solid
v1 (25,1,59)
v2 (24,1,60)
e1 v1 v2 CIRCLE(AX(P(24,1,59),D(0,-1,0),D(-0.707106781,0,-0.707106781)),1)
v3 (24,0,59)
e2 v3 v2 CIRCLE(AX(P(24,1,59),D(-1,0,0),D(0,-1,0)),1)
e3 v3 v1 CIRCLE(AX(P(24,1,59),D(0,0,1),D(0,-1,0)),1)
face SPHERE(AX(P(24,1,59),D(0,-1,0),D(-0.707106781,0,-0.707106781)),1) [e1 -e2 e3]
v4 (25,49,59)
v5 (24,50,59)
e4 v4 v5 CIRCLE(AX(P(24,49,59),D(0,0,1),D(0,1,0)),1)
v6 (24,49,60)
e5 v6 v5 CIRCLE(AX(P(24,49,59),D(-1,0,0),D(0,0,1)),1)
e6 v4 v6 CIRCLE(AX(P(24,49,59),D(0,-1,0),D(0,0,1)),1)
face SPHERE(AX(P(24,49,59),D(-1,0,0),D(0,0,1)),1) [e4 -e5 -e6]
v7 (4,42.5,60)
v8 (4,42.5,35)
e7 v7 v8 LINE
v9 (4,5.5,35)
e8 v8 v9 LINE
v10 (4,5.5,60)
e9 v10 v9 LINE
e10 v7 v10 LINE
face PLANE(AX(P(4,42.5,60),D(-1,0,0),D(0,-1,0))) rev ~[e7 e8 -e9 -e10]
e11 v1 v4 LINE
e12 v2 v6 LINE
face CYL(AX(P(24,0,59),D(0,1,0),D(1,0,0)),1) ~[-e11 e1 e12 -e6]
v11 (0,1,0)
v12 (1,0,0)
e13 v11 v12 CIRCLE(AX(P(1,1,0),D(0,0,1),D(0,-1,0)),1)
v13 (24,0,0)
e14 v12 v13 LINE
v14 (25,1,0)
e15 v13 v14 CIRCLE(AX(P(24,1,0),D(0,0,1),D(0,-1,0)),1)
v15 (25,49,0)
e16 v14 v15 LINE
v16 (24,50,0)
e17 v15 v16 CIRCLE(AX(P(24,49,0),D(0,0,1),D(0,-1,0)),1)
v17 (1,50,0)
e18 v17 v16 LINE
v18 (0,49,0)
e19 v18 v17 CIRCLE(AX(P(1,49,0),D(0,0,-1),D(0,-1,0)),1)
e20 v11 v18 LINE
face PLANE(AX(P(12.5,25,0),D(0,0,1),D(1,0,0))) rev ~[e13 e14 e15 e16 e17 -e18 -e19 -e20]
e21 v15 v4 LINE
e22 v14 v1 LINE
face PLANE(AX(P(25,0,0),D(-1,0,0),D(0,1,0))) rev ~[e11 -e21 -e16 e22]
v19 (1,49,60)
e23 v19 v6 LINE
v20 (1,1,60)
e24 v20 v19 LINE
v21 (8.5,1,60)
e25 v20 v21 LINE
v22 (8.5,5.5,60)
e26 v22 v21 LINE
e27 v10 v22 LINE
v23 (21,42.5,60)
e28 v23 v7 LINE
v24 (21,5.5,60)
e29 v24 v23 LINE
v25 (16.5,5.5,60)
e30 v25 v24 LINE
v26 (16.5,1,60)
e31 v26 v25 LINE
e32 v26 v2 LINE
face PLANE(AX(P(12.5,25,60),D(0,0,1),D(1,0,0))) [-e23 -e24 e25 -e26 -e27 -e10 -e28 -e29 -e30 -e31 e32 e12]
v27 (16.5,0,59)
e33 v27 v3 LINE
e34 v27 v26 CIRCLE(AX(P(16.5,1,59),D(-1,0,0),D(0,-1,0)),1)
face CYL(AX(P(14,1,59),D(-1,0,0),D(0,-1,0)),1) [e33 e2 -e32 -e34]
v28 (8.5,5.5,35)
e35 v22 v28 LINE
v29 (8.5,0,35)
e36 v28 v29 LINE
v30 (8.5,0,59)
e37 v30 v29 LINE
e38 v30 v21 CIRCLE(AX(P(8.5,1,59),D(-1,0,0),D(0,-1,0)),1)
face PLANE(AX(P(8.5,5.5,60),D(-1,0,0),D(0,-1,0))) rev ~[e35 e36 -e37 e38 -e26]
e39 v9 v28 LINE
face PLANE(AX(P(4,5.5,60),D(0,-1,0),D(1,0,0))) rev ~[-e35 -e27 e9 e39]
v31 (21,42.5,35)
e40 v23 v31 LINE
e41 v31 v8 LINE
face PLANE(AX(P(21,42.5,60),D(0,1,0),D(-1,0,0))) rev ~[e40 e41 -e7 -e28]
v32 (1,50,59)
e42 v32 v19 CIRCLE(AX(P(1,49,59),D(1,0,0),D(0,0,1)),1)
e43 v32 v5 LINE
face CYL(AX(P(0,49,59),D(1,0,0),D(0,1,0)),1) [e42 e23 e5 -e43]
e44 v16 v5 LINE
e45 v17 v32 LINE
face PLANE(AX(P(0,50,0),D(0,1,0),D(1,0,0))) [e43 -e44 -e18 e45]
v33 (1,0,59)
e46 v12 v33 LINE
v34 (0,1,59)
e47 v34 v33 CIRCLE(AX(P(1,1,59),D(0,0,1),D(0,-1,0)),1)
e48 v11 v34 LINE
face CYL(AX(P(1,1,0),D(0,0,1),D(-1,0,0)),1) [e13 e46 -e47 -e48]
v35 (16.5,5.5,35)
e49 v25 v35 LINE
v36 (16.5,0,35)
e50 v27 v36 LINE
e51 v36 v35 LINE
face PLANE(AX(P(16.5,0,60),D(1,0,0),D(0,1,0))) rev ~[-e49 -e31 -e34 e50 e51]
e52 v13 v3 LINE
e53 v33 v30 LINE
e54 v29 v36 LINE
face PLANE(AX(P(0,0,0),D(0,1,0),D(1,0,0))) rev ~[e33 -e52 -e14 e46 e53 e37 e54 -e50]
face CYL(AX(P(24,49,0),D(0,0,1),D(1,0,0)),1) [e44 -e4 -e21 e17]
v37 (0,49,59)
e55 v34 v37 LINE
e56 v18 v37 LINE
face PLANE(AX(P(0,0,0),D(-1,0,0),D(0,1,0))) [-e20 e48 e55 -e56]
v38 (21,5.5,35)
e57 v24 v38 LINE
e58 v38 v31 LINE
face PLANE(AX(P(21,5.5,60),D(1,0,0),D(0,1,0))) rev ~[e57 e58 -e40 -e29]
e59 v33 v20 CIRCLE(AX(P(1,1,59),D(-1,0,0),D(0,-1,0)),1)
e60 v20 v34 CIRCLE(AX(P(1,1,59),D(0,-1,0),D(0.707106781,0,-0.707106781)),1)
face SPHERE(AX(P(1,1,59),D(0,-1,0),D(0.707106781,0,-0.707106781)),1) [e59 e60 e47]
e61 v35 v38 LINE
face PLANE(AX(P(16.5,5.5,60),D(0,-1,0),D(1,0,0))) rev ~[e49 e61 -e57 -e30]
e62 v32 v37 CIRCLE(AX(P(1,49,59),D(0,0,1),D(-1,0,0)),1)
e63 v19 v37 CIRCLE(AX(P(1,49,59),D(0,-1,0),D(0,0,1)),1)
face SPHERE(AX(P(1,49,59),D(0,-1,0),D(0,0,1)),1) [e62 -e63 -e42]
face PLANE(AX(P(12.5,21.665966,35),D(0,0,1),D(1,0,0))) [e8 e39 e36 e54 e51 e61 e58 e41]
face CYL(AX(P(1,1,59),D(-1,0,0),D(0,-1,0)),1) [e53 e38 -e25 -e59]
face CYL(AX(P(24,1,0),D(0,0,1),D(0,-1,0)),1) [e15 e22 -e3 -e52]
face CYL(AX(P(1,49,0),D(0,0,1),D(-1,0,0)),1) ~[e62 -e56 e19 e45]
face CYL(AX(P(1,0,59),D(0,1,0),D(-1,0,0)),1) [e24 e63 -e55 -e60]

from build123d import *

# Parameters (mm, degrees)
F0_W         = 25
F0_H         = 50
F1_DEPTH     = 60
F2_R         = 1
F4_DEPTH     = 25
F5_T1_DEPTH  = 10
F5_T3_DEPTH  = 10
F5_S7_W      = 1
F5_S7_H      = 1
F5_T8_DEPTH  = 1
F5_S13_W     = 1
F5_S13_H     = 1
F5_T14_DEPTH = 1


# Not quite as in the source:
# - a fillet or chamfer that OpenCascade refuses, or shapes differently, is made with other operations: its cross-section is extruded or revolved along the edge and cut away or added


with BuildPart() as f1:
    # F0 (on Top) → F1 (new body)
    with BuildSketch(Plane.XY):
        with Locations((12.5, 25)):
            Rectangle(F0_W, F0_H)
    extrude(amount=F1_DEPTH)

    # F2
    f2_edges = [f1.edges().sort_by_distance(p)[0] for p in [
        (0, 25, 60),
        (12.5, 50, 60),
        (25, 25, 60),
        (25, 0, 30),
        (0, 0, 30),
        (0, 50, 30),
        (25, 50, 30),
    ]]
    fillet(f2_edges, radius=F2_R)

    # F3 (on face) → F4 (cut)
    with BuildSketch(Plane.XY.offset(60)):
        Polygon((21, 42.5), (4, 42.5), (4, 5.5), (8.5, 5.5), (8.5, 0), (16.5, 0), (16.5, 5.5), (21, 5.5), align=None)
    extrude(amount=-F4_DEPTH, mode=Mode.SUBTRACT)

    # F5: fillet of radius 1 on 2 edges, made by hand

    # F5_s2 → F5_t1 (cut)
    with BuildSketch(Plane.YZ.offset(1)):
        with BuildLine():
            ThreePointArc((0, 59), (0.2928932188, 59.7071067812), (1, 60))
            Line((1, 60), (0, 60))
            Line((0, 60), (0, 59))
        make_face()
    extrude(amount=F5_T1_DEPTH, mode=Mode.SUBTRACT)

    # F5_s4 → F5_t3 (cut)
    with BuildSketch(Plane.YZ.offset(14)):
        with BuildLine():
            ThreePointArc((0, 59), (0.2928932188, 59.7071067812), (1, 60))
            Line((1, 60), (0, 60))
            Line((0, 60), (0, 59))
        make_face()
    extrude(amount=F5_T3_DEPTH, mode=Mode.SUBTRACT)


with BuildPart() as f5_tool6:
    # F5_s7 → F5_t8 (new body)
    with BuildSketch(Plane.XZ.offset(-1)):
        with Locations((24.5, 59.5)):
            Rectangle(F5_S7_W, F5_S7_H)
    extrude(amount=F5_T8_DEPTH)

    # F5_s9 → F5_t10 (revolve, cut)
    with BuildSketch(Plane(origin=(24, 1, 59), x_dir=(-0.7071067812, 0, -0.7071067812), z_dir=(-0.7071067812, 0, 0.7071067812))):
        with BuildLine():
            ThreePointArc((0, -1), (1, 0), (0, 1))
            Line((0, 1), (0, -1))
        make_face()
    revolve(axis=Axis((24, 1, 59), (0, -1, 0)), mode=Mode.SUBTRACT)


with BuildPart() as f1_1:
    add(f1.part)

    # F5_t5: cut F5_tool6
    add(f5_tool6.part, mode=Mode.SUBTRACT)


with BuildPart() as f5_tool12:
    # F5_s13 → F5_t14 (new body)
    with BuildSketch(Plane.XZ.offset(-1)):
        with Locations((0.5, 59.5)):
            Rectangle(F5_S13_W, F5_S13_H)
    extrude(amount=F5_T14_DEPTH)

    # F5_s15 → F5_t16 (revolve, cut)
    with BuildSketch(Plane(origin=(1, 1, 59), x_dir=(0.7071067812, 0, -0.7071067812), z_dir=(-0.7071067812, 0, -0.7071067812))):
        with BuildLine():
            ThreePointArc((0, -1), (1, 0), (0, 1))
            Line((0, 1), (0, -1))
        make_face()
    revolve(axis=Axis((1, 1, 59), (0, -1, 0)), mode=Mode.SUBTRACT)


with BuildPart() as f1_2:
    add(f1_1.part)

    # F5_t11: cut F5_tool12
    add(f5_tool12.part, mode=Mode.SUBTRACT)


solid = f1_2.part
